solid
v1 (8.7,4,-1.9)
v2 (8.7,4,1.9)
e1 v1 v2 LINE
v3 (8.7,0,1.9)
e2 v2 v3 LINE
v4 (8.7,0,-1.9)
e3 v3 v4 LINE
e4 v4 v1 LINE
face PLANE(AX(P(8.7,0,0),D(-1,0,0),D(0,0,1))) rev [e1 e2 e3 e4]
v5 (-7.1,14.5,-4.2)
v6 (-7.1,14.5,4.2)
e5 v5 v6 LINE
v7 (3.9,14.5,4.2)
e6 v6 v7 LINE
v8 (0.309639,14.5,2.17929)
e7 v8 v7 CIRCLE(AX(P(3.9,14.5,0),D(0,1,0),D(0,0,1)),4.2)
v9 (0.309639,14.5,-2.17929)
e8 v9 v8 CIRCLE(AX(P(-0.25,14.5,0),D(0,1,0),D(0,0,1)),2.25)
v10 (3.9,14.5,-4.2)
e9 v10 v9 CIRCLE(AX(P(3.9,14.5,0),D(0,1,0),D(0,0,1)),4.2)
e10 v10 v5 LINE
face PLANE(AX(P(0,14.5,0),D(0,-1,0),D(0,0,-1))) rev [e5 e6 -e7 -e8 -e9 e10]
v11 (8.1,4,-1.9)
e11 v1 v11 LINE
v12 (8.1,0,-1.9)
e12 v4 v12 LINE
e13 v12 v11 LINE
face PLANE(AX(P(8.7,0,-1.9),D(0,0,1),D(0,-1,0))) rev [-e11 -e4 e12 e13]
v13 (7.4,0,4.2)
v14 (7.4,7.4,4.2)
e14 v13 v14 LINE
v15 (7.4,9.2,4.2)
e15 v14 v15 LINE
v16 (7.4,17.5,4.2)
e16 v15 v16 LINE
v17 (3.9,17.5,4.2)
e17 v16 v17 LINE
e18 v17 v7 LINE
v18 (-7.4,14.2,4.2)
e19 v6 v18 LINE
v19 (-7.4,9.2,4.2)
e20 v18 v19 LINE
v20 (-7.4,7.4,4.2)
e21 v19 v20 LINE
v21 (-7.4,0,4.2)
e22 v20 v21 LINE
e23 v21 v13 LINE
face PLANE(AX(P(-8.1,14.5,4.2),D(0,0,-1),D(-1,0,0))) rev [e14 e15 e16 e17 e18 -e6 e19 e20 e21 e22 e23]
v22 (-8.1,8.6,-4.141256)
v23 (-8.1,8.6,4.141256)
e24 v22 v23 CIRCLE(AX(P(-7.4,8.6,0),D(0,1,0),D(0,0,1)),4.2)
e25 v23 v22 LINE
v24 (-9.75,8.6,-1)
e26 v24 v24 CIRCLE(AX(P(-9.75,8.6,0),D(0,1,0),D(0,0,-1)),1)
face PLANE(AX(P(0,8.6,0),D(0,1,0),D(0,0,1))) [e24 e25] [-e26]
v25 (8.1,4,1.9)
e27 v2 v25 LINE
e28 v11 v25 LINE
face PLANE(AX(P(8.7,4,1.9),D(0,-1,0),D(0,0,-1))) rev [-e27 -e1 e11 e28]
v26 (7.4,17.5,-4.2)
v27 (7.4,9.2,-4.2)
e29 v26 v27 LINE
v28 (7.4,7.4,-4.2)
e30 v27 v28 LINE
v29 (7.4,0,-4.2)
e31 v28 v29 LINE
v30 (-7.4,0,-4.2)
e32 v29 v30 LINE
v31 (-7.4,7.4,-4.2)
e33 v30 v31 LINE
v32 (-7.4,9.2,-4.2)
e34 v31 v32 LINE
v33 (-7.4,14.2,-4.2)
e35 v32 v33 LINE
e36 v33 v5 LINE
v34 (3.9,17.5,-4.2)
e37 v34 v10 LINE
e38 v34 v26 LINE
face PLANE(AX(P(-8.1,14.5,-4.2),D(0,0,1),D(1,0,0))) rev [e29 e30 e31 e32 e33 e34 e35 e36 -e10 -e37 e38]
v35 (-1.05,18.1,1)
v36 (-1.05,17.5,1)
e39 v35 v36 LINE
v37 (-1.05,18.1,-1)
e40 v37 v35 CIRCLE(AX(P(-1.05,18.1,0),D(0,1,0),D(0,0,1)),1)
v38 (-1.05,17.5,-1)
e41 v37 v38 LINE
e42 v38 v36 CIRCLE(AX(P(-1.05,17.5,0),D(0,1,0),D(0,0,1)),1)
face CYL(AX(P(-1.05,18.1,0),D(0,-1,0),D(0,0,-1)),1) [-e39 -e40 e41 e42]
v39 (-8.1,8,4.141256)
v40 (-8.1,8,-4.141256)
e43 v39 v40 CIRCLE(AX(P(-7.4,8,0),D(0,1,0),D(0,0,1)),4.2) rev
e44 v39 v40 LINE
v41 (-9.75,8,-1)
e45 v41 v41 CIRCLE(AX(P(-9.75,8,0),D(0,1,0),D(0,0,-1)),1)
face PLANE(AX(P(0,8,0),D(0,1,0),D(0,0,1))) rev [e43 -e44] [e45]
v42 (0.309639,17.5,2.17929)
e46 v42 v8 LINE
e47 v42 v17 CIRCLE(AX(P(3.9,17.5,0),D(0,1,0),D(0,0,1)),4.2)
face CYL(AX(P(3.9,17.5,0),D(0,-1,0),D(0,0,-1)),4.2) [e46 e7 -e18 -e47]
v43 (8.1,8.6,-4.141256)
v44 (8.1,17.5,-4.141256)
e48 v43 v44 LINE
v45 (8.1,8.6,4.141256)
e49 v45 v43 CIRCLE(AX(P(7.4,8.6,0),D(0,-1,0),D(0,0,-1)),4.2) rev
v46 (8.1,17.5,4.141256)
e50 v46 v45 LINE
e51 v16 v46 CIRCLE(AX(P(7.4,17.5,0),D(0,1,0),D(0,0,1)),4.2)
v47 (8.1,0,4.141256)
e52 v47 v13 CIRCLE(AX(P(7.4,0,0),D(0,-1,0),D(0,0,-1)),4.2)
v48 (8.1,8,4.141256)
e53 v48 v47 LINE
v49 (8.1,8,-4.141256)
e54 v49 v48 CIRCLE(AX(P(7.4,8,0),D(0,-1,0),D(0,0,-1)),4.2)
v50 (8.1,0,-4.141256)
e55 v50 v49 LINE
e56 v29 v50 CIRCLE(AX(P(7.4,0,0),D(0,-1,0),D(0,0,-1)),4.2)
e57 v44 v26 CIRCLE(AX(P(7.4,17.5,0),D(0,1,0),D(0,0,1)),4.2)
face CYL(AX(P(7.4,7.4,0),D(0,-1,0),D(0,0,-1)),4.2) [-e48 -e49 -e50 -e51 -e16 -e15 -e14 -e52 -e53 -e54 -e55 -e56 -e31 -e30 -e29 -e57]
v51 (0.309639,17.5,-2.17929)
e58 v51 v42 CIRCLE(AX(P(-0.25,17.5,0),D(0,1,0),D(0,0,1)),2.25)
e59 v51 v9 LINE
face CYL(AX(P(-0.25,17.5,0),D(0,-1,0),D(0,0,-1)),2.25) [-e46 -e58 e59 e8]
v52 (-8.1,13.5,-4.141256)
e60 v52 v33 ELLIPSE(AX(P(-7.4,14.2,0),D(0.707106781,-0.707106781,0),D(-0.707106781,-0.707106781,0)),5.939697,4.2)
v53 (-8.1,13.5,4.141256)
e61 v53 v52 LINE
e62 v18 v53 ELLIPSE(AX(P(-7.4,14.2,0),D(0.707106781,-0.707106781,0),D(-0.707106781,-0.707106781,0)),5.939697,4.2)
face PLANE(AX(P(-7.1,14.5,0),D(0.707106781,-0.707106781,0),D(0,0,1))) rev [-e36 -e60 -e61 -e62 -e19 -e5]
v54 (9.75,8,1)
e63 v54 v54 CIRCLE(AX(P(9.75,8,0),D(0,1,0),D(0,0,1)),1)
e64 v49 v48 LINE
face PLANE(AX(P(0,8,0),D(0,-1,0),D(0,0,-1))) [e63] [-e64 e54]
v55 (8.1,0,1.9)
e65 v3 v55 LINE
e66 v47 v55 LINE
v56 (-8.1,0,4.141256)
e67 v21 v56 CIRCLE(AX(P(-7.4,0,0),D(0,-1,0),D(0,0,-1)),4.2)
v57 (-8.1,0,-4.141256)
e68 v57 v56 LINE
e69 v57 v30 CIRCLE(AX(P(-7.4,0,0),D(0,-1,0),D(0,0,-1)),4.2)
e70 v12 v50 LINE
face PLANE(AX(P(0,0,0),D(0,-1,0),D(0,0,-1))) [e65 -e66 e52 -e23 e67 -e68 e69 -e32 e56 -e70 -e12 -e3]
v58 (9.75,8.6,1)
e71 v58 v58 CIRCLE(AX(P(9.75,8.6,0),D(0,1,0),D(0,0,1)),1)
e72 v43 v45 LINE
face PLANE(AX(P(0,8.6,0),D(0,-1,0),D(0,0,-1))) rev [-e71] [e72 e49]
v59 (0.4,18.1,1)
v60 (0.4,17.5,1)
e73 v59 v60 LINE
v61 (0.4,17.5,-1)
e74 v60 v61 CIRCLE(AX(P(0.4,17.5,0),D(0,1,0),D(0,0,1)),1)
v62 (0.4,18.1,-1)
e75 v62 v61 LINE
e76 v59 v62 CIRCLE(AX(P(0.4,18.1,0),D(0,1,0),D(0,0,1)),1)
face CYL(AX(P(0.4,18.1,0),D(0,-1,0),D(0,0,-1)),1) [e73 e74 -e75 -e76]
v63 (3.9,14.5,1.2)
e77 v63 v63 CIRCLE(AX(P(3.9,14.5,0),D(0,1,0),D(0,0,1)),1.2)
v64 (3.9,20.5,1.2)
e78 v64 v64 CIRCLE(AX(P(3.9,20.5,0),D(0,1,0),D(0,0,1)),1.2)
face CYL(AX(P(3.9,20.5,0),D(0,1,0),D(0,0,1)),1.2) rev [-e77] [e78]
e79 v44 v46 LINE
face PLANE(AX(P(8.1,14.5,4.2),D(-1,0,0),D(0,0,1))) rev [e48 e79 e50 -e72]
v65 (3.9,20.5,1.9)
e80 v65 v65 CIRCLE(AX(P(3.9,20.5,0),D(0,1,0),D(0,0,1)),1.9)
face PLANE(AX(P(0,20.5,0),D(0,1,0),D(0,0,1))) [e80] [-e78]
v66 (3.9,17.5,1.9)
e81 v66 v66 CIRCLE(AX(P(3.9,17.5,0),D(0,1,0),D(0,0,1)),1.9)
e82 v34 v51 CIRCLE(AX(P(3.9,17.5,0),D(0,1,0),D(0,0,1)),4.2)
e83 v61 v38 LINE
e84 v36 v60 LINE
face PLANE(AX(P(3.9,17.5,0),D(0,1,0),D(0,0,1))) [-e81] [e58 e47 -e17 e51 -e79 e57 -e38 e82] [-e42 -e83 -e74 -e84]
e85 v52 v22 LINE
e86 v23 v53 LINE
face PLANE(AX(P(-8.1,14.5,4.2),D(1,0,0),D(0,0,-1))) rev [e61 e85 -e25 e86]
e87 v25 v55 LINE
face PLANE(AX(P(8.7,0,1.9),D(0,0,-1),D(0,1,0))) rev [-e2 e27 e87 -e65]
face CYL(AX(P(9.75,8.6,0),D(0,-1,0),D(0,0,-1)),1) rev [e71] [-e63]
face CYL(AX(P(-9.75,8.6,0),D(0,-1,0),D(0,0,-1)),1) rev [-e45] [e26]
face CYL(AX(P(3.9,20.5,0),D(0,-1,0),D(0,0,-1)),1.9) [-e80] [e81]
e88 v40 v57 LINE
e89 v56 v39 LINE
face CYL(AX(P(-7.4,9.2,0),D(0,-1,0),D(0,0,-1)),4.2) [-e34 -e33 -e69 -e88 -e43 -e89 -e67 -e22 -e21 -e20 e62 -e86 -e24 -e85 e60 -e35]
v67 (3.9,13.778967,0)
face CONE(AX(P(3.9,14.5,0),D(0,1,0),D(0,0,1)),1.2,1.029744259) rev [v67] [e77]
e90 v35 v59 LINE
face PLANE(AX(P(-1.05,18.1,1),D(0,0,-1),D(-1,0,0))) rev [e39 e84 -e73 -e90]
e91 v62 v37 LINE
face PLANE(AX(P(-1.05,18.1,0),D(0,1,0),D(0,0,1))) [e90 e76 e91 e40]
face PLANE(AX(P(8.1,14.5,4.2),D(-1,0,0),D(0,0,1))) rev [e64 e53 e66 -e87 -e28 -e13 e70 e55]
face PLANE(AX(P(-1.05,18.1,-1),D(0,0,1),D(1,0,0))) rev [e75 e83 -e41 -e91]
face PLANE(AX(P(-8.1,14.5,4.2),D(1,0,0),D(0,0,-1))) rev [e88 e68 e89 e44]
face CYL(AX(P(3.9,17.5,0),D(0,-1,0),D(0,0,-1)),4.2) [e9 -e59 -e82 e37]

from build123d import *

# Parameters (mm, degrees)
SKETCH1_W                = 16.2
SKETCH1_H                = 8.4
BOSS_EXTRUDE1_DEPTH      = 14.5
SKETCH3_R                = 1.9
BOSS_EXTRUDE2_DEPTH      = 3
SKETCH3_3_R              = 1.9
BOSS_EXTRUDE3_DEPTH      = 6
SKETCH6_W                = 3.5
SKETCH6_H                = 8.4
SKETCH6_R                = 1
BOSS_EXTRUDE4_DEPTH      = 0.6
FILLET2_START            = -1
FILLET2_DEPTH            = 19
FILLET3_START            = -1
FILLET3_DEPTH            = 16
BOSS_EXTRUDE5_DEPTH      = 0.6
SKETCH8_W                = 3.8
SKETCH8_H                = 4
BOSS_EXTRUDE6_DEPTH      = 0.6
CHAMFER1_SIZE            = 1
M2_CLEARANCE_HOLE1_D     = 2.4
M2_CLEARANCE_HOLE1_DEPTH = 6
M2_CLEARANCE_HOLE1_TIP   = 0.721032743


with BuildPart() as part:
    # Sketch1 → Boss-Extrude1 (new body)
    with BuildSketch(Plane(origin=(0, 0, 0), x_dir=(1, 0, 0), z_dir=(0, 1, 0))):
        Rectangle(SKETCH1_W, SKETCH1_H)
    extrude(amount=BOSS_EXTRUDE1_DEPTH)

    # Sketch3 → Boss-Extrude2 (add)
    with BuildSketch(Plane(origin=(0, 14.5, 0), x_dir=(1, 0, 0), z_dir=(0, 1, 0))):
        with BuildLine():
            Line((3.9, 4.2), (8.1, 4.2))
            Line((8.1, 4.2), (8.1, -4.2))
            Line((8.1, -4.2), (3.9, -4.2))
            ThreePointArc((3.9, -4.2), (1.840026431, -3.660124164), (0.309638554, -2.179289951))
            ThreePointArc((0.309638554, -2.179289951), (-2.5, 0), (0.309638554, 2.179289951))
            ThreePointArc((0.309638554, 2.179289951), (1.840026431, 3.660124164), (3.9, 4.2))
        make_face()
        with Locations(Location((3.9, 0, 0), (0, 0, 270))):
            Circle(SKETCH3_R, mode=Mode.SUBTRACT)
    extrude(amount=BOSS_EXTRUDE2_DEPTH)

    # Sketch3<3> → Boss-Extrude3 (add)
    with BuildSketch(Plane(origin=(0, 14.5, 0), x_dir=(1, 0, 0), z_dir=(0, 1, 0))):
        with Locations(Location((3.9, 0, 0), (0, 0, 270))):
            Circle(SKETCH3_3_R)
    extrude(amount=BOSS_EXTRUDE3_DEPTH)

    # Sketch6 → Boss-Extrude4 (add)
    # profile 1 of 2: a face of its own
    with BuildSketch(Plane(origin=(0, 8, 0), x_dir=(1, 0, 0), z_dir=(0, 1, 0))):
        with Locations((9.85, 0)):
            Rectangle(SKETCH6_W, SKETCH6_H)
        with Locations(Location((9.75, 0, 0), (0, 0, 270))):
            Circle(SKETCH6_R, mode=Mode.SUBTRACT)
    # profile 2 of 2: a face of its own
    with BuildSketch(Plane(origin=(0, 8, 0), x_dir=(1, 0, 0), z_dir=(0, 1, 0))):
        with Locations((-9.85, 0)):
            Rectangle(SKETCH6_W, SKETCH6_H)
        with Locations(Location((-9.75, 0, 0), (0, 0, 90))):
            Circle(SKETCH6_R, mode=Mode.SUBTRACT)
    extrude(amount=BOSS_EXTRUDE4_DEPTH)

    # Fillet2: read off the stored shape, not the designer's step
    # Fillet2 outline → Fillet2 (cut)
    with BuildSketch(Plane(origin=(0, 0, 0), x_dir=(1, 0, 0), z_dir=(0, 1, 0)).offset(FILLET2_START)):
        with BuildLine():
            ThreePointArc((7.4, 4.2), (10.369848481, 2.969848481), (11.6, 0))
            Line((11.6, 0), (11.6, 4.2))
            Line((11.6, 4.2), (7.4, 4.2))
        make_face()
        with BuildLine():
            Line((11.6, -4.2), (11.6, 0))
            ThreePointArc((11.6, 0), (10.369848481, -2.969848481), (7.4, -4.2))
            Line((7.4, -4.2), (11.6, -4.2))
        make_face()
    extrude(amount=FILLET2_DEPTH, mode=Mode.SUBTRACT)

    # Fillet3: read off the stored shape, not the designer's step
    # Fillet3 outline → Fillet3 (cut)
    with BuildSketch(Plane(origin=(0, 0, 0), x_dir=(1, 0, 0), z_dir=(0, 1, 0)).offset(FILLET3_START)):
        with BuildLine():
            ThreePointArc((-7.4, -4.2), (-10.369848481, -2.969848481), (-11.6, 0))
            Line((-11.6, 0), (-11.6, -4.2))
            Line((-11.6, -4.2), (-7.4, -4.2))
        make_face()
        with BuildLine():
            Line((-11.6, 4.2), (-11.6, 0))
            ThreePointArc((-11.6, 0), (-10.369848481, 2.969848481), (-7.4, 4.2))
            Line((-7.4, 4.2), (-11.6, 4.2))
        make_face()
    extrude(amount=FILLET3_DEPTH, mode=Mode.SUBTRACT)

    # Sketch7 → Boss-Extrude5 (add)
    with BuildSketch(Plane(origin=(0, 17.5, 0), x_dir=(1, 0, 0), z_dir=(0, 1, 0))):
        with BuildLine():
            Line((-1.05, 1), (0.4, 1))
            ThreePointArc((0.4, 1), (1.4, 0), (0.4, -1))
            Line((0.4, -1), (-1.05, -1))
            ThreePointArc((-1.05, -1), (-2.05, 0), (-1.05, 1))
        make_face()
    extrude(amount=BOSS_EXTRUDE5_DEPTH)

    # Sketch8 → Boss-Extrude6 (add)
    with BuildSketch(Plane(origin=(8.1, 0, 0), x_dir=(0, 0, -1), z_dir=(1, 0, 0))):
        with Locations((0, 2)):
            Rectangle(SKETCH8_W, SKETCH8_H)
    extrude(amount=BOSS_EXTRUDE6_DEPTH)

    # Chamfer1
    chamfer1_edges = [part.edges().sort_by_distance(p)[0] for p in [
        (-8.1, 14.5, 0),
    ]]
    chamfer(chamfer1_edges, length=CHAMFER1_SIZE)

    # M2 Clearance Hole1
    with Locations(Plane(origin=(0, 20.5, 0), x_dir=(1, 0, 0), z_dir=(0, 1, 0))):
        with Locations((3.9, 0)):
            Hole(M2_CLEARANCE_HOLE1_D / 2, depth=M2_CLEARANCE_HOLE1_DEPTH)
            with Locations((0, 0, -(M2_CLEARANCE_HOLE1_DEPTH + M2_CLEARANCE_HOLE1_TIP / 2))):  # 118° drill point
                Cone(0, M2_CLEARANCE_HOLE1_D / 2, M2_CLEARANCE_HOLE1_TIP, mode=Mode.SUBTRACT)


solid = part.part
